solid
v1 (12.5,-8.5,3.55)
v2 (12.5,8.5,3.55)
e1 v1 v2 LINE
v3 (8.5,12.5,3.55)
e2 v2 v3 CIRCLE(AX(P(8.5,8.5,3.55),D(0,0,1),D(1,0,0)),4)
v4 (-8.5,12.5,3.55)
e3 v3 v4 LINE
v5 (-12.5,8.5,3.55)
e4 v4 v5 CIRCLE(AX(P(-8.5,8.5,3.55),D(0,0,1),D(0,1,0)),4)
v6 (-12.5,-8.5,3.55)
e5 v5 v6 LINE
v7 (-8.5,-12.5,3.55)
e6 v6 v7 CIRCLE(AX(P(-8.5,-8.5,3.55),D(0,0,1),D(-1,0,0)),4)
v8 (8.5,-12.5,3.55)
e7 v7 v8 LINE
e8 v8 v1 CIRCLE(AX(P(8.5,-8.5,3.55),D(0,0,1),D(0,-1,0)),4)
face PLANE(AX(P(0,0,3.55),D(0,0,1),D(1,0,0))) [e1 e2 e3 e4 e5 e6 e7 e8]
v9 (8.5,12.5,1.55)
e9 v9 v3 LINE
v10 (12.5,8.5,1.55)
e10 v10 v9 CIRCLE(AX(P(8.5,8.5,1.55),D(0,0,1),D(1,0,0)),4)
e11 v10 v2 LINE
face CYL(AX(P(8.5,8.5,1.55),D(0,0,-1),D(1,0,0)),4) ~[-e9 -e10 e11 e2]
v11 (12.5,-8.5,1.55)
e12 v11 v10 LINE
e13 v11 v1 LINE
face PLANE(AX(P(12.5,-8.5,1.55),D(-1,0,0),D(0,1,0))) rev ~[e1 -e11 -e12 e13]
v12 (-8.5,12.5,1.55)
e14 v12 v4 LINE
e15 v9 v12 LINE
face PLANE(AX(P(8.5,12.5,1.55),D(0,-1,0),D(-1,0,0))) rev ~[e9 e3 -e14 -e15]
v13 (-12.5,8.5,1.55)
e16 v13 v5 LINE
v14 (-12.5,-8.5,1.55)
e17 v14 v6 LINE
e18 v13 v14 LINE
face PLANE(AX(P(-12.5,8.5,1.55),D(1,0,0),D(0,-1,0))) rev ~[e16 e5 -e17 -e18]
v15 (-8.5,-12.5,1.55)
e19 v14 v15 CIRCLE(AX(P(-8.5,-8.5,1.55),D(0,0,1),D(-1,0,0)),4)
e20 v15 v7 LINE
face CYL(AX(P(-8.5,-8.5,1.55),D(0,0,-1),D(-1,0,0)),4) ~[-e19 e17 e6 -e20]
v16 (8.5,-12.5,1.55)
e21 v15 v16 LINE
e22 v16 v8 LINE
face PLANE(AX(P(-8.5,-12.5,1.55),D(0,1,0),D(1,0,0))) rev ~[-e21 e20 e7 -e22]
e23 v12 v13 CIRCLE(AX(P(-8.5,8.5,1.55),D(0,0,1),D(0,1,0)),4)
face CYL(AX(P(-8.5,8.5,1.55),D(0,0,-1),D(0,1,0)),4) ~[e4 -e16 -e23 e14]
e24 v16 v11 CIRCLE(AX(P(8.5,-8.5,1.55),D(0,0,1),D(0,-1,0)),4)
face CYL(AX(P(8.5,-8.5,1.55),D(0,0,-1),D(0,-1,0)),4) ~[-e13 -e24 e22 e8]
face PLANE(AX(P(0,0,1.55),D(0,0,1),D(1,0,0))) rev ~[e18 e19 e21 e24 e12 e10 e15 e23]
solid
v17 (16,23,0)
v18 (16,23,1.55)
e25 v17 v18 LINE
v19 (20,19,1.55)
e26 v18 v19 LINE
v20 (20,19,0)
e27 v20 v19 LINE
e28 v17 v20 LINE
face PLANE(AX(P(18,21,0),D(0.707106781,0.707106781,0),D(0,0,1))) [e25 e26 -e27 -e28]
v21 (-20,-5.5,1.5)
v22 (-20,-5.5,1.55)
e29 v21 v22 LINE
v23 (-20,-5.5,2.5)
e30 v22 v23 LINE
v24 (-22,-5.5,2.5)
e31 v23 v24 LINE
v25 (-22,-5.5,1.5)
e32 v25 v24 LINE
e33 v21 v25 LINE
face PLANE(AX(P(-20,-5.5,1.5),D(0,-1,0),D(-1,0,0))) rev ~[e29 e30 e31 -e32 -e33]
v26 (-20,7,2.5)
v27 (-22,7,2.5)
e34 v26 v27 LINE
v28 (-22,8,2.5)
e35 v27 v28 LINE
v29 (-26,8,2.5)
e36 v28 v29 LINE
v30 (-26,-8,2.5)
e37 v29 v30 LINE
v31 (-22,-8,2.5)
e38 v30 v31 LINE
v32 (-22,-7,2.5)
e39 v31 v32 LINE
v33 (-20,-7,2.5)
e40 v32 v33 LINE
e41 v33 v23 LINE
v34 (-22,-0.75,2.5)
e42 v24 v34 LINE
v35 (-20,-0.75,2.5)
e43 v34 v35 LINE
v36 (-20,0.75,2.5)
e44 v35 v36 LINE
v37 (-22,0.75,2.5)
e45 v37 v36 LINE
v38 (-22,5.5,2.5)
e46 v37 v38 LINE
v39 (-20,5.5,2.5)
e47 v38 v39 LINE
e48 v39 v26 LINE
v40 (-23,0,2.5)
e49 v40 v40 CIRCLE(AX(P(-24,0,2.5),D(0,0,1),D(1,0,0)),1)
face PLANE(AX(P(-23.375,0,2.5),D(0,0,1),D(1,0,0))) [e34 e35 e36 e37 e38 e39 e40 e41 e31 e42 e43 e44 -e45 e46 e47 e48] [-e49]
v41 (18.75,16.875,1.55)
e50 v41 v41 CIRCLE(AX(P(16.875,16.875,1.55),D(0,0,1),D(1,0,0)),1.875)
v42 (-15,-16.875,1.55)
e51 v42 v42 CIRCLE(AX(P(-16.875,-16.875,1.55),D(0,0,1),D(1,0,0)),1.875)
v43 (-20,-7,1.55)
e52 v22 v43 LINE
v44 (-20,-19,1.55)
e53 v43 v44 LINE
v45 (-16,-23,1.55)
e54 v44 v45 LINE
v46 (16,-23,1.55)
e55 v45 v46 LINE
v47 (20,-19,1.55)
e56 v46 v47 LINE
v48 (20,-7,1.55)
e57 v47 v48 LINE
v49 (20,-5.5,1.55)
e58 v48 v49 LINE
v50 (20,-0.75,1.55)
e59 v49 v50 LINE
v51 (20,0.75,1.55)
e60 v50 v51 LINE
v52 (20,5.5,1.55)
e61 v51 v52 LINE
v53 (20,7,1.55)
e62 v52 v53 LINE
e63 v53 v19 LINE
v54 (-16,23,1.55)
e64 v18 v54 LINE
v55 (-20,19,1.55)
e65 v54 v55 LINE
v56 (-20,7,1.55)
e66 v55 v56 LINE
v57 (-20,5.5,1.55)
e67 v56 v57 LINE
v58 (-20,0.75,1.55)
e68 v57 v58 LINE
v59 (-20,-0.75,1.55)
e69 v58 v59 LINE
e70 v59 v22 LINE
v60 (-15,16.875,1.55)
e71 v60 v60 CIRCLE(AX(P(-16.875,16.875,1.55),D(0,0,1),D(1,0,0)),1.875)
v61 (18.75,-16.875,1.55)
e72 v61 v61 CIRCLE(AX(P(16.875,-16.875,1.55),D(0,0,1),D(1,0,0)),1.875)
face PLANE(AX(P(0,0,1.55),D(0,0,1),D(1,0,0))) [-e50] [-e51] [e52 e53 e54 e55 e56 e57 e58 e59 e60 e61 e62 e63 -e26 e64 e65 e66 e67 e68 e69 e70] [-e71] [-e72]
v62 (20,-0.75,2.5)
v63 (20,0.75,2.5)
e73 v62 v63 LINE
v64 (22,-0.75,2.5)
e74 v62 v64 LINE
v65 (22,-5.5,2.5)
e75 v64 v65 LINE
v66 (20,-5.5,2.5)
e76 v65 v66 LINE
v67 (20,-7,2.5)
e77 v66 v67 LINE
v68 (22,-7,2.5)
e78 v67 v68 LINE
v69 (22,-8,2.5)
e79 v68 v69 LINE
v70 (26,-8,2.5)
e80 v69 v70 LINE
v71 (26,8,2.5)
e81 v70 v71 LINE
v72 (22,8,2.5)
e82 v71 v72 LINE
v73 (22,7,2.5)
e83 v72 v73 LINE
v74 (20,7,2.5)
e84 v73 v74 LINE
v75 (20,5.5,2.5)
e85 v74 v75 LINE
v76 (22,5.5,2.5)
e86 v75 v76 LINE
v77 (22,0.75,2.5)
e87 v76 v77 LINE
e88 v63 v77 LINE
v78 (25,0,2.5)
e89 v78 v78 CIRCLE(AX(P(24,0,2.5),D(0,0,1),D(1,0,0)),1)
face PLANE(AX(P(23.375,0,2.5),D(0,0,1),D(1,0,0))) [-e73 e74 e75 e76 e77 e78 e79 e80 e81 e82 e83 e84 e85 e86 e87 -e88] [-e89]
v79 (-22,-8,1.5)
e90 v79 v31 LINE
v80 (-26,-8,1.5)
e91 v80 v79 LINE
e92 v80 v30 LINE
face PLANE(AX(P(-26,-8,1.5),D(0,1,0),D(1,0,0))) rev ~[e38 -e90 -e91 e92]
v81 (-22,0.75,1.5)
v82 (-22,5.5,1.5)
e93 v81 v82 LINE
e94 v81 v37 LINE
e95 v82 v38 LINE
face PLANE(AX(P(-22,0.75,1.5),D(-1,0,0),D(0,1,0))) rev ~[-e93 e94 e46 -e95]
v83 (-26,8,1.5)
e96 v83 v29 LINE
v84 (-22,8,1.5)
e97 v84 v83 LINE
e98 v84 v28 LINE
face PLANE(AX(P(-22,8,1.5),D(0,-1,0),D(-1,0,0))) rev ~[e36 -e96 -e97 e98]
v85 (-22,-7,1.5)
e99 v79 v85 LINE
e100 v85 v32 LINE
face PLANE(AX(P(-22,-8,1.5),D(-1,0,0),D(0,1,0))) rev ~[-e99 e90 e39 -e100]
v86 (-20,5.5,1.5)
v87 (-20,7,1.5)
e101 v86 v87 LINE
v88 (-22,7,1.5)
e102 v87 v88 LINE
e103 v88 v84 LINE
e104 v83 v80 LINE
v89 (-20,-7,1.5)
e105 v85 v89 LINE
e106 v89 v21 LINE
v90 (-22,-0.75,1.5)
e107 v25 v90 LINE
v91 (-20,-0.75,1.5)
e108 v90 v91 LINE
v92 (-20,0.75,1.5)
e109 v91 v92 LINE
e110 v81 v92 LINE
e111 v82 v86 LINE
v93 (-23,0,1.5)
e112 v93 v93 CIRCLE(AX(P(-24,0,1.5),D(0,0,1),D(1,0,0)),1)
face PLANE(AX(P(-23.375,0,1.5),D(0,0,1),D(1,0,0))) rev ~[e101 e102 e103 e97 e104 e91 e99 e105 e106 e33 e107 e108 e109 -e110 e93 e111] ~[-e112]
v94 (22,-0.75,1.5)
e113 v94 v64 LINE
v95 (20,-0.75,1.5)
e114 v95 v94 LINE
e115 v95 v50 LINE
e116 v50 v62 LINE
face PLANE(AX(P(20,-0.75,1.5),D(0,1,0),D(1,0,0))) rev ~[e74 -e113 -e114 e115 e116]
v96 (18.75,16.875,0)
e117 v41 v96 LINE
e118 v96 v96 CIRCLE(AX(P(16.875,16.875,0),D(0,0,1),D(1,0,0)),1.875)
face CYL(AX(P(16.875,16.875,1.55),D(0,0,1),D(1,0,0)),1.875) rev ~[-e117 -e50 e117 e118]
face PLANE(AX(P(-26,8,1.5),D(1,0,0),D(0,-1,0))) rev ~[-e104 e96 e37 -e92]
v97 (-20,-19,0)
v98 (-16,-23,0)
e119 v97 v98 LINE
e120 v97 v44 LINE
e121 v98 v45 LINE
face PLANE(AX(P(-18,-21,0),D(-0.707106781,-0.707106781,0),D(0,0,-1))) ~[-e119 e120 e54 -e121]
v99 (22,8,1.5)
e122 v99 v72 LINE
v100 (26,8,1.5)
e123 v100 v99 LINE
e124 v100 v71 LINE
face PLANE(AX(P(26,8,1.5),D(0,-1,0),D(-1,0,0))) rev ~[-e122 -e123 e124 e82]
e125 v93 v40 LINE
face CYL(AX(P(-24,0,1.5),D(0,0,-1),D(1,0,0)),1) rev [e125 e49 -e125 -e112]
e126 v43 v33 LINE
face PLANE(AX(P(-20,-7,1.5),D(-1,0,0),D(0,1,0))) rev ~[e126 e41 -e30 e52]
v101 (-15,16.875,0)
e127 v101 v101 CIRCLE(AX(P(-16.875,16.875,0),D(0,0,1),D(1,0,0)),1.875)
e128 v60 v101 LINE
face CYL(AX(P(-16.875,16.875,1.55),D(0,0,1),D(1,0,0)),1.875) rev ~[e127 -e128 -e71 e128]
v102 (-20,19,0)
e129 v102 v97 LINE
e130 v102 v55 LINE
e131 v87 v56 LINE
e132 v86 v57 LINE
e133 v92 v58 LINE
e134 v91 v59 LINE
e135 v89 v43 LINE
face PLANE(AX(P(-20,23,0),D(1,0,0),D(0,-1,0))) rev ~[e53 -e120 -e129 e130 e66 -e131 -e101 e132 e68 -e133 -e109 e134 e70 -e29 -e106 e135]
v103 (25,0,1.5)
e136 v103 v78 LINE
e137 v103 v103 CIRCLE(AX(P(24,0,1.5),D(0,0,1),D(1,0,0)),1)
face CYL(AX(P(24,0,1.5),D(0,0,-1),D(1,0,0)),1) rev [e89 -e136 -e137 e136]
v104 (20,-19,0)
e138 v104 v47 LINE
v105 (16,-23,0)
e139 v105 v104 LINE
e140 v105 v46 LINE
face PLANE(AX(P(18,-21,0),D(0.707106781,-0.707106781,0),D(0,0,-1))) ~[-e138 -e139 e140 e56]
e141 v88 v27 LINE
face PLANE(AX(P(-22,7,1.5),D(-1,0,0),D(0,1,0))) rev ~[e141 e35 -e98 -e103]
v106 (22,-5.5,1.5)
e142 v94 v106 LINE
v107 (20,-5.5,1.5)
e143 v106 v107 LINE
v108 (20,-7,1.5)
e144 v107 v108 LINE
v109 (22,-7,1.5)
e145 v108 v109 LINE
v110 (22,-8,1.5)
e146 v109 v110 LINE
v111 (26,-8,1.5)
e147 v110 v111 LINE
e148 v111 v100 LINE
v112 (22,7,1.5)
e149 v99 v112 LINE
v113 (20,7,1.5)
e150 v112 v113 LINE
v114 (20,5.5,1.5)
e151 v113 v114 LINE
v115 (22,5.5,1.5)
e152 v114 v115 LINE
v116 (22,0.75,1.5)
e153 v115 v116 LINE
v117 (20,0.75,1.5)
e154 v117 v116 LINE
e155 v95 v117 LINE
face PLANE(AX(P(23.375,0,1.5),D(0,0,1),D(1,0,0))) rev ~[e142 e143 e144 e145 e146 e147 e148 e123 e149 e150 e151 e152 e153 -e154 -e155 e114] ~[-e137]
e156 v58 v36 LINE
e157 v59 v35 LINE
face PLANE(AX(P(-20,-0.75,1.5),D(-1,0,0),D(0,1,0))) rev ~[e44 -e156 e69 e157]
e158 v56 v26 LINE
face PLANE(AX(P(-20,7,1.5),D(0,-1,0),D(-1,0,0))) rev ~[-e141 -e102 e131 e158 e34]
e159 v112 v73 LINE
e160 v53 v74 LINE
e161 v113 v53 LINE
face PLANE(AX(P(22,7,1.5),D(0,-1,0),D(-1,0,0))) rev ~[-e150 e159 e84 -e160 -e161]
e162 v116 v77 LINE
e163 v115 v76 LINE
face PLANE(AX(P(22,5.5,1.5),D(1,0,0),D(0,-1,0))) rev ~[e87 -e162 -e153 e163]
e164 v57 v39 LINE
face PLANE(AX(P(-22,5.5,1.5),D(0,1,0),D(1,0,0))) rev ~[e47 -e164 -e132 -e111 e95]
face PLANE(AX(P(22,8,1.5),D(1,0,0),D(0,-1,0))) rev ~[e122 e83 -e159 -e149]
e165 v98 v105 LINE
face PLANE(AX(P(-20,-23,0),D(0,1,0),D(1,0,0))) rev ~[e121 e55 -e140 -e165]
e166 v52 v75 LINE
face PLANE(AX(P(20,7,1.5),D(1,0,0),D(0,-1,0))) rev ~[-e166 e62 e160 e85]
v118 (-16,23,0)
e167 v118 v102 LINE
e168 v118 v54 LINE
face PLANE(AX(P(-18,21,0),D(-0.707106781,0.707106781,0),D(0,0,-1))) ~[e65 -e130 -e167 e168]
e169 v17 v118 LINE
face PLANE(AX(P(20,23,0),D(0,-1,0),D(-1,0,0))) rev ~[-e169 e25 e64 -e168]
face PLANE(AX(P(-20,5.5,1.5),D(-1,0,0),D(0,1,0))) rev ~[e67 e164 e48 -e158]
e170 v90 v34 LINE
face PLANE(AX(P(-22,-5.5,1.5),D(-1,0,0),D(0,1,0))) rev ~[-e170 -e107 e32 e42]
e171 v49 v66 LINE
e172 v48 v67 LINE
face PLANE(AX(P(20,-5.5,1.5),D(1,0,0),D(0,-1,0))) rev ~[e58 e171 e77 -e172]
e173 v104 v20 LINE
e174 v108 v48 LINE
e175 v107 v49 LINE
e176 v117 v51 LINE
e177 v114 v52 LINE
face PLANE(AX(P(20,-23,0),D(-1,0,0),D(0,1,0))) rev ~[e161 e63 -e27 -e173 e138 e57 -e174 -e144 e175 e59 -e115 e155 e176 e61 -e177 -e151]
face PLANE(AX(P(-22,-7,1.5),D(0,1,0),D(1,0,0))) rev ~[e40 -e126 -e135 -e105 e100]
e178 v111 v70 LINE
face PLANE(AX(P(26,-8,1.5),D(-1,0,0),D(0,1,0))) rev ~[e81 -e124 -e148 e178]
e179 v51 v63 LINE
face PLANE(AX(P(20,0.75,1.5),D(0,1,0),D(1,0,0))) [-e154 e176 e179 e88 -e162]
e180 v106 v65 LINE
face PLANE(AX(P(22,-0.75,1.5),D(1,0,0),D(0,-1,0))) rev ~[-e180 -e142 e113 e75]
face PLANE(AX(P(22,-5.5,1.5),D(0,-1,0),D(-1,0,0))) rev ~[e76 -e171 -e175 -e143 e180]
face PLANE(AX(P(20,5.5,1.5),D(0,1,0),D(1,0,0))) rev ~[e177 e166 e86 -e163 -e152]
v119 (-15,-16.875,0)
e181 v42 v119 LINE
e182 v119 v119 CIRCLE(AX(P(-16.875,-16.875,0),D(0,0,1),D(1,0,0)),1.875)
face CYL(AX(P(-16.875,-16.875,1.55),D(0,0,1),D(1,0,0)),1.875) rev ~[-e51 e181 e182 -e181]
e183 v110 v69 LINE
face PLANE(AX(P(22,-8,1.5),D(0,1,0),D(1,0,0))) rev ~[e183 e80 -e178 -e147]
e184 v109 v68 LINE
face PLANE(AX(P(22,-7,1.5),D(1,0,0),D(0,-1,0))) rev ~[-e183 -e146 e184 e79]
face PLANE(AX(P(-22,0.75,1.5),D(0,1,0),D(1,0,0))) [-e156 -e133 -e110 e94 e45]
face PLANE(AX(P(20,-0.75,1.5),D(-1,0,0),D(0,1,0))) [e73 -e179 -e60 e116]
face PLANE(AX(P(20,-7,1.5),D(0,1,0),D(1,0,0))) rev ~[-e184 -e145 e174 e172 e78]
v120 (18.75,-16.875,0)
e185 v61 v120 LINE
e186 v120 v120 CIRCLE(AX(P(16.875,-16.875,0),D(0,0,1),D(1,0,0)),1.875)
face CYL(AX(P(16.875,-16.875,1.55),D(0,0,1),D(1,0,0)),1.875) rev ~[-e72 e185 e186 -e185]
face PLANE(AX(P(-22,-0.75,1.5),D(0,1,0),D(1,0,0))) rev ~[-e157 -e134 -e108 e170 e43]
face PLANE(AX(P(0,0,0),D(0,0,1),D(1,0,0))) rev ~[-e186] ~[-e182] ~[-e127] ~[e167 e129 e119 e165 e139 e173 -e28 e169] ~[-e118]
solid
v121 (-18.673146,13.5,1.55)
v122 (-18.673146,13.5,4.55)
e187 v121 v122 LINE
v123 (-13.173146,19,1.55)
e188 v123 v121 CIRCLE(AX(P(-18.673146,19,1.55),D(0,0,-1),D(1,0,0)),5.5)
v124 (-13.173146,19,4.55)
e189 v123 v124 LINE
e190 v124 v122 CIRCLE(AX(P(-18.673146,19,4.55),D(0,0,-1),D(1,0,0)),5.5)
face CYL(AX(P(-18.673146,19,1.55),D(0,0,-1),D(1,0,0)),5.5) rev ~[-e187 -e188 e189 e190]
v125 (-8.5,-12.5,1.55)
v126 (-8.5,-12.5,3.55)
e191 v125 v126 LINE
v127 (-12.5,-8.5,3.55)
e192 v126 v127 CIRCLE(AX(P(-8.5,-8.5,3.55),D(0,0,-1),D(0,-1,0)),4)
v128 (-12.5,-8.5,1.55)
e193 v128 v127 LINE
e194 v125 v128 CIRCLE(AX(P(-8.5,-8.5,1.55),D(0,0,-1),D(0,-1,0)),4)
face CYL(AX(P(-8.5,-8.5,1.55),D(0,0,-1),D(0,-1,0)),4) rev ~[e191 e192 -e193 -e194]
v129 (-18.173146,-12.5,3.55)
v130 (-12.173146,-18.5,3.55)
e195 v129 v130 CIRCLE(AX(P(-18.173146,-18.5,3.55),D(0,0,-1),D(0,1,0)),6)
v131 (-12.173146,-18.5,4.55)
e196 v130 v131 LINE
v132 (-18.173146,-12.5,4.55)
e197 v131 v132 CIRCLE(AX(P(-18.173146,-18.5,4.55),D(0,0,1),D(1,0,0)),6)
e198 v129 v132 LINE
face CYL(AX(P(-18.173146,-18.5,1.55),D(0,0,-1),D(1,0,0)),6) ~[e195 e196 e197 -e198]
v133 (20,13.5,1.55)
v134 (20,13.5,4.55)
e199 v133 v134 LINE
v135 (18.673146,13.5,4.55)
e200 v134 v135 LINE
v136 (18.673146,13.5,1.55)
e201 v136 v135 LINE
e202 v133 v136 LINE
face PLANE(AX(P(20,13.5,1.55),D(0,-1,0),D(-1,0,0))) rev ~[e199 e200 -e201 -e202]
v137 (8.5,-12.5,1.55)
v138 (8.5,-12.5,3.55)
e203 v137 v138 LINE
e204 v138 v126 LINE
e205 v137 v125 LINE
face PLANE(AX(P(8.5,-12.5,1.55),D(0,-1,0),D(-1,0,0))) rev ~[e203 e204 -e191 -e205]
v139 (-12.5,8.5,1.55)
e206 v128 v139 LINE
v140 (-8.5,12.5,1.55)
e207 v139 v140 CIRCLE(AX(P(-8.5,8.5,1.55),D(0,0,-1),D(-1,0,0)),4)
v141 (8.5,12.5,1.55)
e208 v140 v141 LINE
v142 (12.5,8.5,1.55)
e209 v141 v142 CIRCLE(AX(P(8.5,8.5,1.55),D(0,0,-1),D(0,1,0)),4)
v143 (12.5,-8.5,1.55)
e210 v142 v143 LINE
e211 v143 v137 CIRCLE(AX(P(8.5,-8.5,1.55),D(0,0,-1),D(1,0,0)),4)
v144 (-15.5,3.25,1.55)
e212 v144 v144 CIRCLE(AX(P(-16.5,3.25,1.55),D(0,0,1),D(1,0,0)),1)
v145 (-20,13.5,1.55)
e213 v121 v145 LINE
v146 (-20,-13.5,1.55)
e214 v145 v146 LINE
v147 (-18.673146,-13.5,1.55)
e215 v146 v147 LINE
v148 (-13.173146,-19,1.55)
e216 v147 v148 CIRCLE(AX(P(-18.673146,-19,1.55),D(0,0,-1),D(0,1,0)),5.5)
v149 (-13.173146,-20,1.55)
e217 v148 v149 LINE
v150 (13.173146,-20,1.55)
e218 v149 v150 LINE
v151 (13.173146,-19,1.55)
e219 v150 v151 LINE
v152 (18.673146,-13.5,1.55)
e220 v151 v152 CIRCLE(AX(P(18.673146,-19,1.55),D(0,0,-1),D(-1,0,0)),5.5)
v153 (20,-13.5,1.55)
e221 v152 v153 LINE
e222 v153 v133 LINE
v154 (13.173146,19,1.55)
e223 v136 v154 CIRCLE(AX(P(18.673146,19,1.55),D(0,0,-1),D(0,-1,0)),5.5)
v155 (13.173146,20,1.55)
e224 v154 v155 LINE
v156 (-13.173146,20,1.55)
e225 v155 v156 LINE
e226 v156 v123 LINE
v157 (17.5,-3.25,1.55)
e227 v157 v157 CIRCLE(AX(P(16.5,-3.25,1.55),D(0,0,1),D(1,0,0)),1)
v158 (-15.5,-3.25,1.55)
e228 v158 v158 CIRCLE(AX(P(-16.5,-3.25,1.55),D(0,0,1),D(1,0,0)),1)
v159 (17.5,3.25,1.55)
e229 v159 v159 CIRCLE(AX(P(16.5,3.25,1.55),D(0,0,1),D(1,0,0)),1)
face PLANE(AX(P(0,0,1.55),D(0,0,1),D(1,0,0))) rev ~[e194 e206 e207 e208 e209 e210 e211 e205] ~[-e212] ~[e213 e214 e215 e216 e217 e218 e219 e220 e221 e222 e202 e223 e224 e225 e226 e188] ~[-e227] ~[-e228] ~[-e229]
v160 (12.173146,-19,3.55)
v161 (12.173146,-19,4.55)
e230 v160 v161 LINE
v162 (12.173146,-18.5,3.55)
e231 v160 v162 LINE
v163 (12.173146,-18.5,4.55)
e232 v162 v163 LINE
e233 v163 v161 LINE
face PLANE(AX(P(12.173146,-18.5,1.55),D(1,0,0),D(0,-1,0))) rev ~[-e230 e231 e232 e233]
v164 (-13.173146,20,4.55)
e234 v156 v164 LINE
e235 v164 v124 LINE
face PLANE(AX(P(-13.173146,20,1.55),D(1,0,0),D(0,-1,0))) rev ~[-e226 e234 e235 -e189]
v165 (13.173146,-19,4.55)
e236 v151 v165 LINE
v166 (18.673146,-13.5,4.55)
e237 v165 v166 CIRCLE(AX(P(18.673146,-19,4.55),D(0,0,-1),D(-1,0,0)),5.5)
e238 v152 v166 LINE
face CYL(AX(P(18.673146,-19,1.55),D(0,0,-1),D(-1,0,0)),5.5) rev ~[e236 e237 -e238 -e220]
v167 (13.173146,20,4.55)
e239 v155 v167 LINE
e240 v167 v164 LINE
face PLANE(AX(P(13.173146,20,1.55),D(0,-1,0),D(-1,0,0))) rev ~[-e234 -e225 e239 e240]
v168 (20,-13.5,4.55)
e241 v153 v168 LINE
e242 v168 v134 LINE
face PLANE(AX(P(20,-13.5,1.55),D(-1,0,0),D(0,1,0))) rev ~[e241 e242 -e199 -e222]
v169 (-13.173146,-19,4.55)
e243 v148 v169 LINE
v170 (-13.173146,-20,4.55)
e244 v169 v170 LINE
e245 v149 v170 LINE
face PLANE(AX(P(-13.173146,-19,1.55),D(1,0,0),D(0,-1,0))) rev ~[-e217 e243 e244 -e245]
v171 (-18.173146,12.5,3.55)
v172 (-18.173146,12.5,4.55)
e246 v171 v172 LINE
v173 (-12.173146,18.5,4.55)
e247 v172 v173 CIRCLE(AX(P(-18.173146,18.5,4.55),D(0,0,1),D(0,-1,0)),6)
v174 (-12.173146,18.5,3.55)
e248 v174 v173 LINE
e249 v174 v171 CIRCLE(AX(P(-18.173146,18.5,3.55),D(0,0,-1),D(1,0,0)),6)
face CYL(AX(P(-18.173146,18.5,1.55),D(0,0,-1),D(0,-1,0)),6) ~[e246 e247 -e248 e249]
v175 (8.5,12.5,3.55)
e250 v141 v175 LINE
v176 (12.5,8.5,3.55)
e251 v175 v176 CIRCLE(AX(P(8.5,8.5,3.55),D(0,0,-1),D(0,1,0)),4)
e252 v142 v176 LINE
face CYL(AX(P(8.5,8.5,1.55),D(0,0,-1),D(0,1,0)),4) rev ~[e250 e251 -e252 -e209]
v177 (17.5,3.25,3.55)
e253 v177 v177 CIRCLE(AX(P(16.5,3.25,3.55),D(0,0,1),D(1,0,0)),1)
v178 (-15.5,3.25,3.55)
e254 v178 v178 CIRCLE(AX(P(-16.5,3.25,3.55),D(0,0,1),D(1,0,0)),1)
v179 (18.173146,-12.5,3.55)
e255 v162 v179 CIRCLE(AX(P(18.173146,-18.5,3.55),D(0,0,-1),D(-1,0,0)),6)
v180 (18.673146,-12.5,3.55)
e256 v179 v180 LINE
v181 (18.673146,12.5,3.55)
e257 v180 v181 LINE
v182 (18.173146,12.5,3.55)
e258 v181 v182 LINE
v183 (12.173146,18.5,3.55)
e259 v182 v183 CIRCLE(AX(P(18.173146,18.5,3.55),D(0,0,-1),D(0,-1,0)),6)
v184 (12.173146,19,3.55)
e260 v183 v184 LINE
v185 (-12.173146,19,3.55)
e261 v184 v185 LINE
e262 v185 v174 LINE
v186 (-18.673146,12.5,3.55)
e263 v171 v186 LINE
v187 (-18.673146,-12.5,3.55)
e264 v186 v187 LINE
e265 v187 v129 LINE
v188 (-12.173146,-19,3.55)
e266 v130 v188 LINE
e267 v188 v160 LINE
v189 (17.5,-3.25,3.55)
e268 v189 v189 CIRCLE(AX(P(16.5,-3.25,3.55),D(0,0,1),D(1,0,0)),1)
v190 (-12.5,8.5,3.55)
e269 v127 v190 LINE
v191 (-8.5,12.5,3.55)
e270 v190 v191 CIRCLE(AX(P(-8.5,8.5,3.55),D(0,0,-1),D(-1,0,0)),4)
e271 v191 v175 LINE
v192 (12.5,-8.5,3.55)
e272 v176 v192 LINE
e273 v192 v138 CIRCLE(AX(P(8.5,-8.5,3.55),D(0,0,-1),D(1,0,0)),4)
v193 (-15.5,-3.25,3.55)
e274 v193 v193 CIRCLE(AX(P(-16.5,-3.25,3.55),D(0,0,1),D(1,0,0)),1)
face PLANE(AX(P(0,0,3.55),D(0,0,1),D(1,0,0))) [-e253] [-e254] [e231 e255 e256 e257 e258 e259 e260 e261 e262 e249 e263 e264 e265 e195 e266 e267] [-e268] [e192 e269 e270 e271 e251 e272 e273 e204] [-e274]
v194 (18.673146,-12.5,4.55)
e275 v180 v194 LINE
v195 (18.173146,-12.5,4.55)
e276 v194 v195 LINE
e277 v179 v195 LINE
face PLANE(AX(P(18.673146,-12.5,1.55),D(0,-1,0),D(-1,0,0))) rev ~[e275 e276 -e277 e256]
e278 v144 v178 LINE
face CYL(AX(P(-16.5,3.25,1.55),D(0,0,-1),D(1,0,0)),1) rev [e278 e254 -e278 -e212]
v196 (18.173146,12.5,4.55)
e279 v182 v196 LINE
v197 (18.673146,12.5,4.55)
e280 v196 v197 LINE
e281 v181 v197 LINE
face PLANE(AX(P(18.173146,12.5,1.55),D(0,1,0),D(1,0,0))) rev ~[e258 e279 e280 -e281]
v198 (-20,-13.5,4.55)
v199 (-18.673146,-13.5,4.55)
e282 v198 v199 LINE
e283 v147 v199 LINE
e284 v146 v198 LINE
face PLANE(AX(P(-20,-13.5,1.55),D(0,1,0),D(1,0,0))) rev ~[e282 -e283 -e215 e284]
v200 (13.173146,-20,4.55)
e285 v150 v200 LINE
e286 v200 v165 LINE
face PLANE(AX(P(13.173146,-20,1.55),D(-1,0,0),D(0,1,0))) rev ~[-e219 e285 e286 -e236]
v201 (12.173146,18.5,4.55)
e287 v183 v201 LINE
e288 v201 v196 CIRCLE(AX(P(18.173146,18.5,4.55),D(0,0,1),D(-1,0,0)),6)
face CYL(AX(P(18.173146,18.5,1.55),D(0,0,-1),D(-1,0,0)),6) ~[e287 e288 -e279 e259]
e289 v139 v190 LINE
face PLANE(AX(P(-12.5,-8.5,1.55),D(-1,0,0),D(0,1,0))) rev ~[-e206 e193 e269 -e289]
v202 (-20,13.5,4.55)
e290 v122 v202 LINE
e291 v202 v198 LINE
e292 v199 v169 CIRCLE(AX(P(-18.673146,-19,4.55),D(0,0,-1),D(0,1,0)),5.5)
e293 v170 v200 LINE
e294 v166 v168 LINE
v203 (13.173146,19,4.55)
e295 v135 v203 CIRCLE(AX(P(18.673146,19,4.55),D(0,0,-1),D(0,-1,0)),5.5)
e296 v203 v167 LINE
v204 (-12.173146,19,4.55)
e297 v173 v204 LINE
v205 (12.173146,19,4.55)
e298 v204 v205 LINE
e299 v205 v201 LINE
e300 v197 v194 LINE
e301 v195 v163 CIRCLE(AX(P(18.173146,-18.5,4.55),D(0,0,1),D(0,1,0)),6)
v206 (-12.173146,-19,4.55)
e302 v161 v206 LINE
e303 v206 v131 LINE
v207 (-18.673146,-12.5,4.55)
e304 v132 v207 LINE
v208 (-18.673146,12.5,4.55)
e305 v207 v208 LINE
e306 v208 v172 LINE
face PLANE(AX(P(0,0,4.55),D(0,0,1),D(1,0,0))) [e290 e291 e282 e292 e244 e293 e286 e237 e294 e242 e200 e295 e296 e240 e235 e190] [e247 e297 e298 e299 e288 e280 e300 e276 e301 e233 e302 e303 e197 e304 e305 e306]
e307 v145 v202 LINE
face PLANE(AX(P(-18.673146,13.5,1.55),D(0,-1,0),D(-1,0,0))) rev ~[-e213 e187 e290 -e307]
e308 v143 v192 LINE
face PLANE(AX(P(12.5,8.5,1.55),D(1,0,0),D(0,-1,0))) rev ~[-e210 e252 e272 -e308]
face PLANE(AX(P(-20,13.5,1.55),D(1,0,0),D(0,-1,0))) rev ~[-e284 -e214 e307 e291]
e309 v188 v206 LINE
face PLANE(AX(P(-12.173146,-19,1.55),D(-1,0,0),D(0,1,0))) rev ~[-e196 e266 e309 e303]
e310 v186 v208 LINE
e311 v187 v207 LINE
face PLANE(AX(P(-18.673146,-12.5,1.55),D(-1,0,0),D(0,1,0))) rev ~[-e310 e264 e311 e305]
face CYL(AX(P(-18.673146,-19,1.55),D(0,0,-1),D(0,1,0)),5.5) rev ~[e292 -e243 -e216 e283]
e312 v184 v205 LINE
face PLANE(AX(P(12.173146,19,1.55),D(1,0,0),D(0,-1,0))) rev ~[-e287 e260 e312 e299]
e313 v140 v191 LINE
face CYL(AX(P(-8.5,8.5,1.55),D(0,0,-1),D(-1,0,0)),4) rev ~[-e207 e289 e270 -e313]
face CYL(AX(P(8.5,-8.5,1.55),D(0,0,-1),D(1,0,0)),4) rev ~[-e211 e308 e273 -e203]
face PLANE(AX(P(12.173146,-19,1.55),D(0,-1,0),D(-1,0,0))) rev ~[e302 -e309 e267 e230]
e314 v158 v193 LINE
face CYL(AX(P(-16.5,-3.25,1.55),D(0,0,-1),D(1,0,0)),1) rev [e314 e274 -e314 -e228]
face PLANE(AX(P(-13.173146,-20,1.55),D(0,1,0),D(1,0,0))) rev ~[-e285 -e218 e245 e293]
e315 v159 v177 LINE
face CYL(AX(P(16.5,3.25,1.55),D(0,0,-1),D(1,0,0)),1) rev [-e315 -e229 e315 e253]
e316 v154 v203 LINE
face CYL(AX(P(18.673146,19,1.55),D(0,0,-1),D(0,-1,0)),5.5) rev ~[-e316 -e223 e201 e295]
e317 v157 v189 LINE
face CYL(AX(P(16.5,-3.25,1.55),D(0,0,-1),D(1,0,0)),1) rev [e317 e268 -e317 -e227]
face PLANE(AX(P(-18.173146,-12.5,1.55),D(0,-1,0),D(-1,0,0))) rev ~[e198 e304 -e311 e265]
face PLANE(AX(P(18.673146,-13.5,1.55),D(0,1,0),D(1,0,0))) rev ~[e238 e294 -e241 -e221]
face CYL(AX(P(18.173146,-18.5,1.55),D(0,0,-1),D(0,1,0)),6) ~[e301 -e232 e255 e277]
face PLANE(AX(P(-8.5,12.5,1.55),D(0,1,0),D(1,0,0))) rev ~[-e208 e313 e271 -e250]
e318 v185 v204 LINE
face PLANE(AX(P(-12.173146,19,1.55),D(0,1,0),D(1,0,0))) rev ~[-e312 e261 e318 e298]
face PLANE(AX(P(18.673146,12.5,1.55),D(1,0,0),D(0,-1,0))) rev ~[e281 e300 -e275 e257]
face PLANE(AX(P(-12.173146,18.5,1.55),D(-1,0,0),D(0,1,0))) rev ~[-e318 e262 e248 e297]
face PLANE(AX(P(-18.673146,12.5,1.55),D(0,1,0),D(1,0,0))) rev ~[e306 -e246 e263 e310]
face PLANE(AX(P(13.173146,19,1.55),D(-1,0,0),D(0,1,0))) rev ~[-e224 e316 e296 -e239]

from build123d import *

# Parameters (mm, degrees)
F1_DEPTH = 1.55
F3_SIZE  = 4
F4_R     = 1.875
F5_DEPTH = 4
F6_DEPTH = 3
F2_R     = 1
F2_W     = 1.5
F2_H     = 0.5
F2_W_2   = 0.5
F2_H_2   = 1.5219762474
F2_H_3   = 1.4780237526
F7_DEPTH = 2
F8_DEPTH = 2
F9_START = 1.5
F0_R     = 1
F0_W     = 2
F0_H     = 1.5
F9_DEPTH = 1


with BuildPart() as f1:
    # F0 (on Top) → F1 (new body)
    with BuildSketch(Plane.XY):
        Polygon((20, 23), (-20, 23), (-20, 7), (-20, 5.5), (-20, 0.75), (-20, -0.75), (-20, -5.5), (-20, -7), (-20, -23), (20, -23), (20, -7), (20, -5.5), (20, -0.75), (20, 0.75), (20, 5.5), (20, 7), align=None)
    extrude(amount=F1_DEPTH)

    # F3
    f3_edges = [f1.edges().sort_by_distance(p)[0] for p in [
        (-20, 23, 0.775),
        (20, 23, 0.775),
        (20, -23, 0.775),
        (-20, -23, 0.775),
    ]]
    chamfer(f3_edges, length=F3_SIZE)

    # F4 (on face) → F5 (cut)
    with BuildSketch(Plane.XY.offset(1.55)):
        with Locations((-16.875, -16.875)):
            Circle(F4_R)
        with Locations((16.875, -16.875)):
            Circle(F4_R)
        with Locations((16.875, 16.875)):
            Circle(F4_R)
        with Locations((-16.875, 16.875)):
            Circle(F4_R)
    extrude(amount=-F5_DEPTH, mode=Mode.SUBTRACT)

    # F0 (on Top) → F9 (join)
    with BuildSketch(Plane.XY.offset(F9_START)):
        Polygon((-20, 5.5), (-20, 7), (-22, 7), (-22, 8), (-26, 8), (-26, -8), (-22, -8), (-22, -7), (-20, -7), (-20, -5.5), (-22, -5.5), (-22, -0.75), (-22, 0.75), (-22, 5.5), align=None)
        with Locations((-24, 0)):
            Circle(F0_R, mode=Mode.SUBTRACT)
        Polygon((22, 7), (20, 7), (20, 5.5), (22, 5.5), (22, 0.75), (22, -0.75), (22, -5.5), (20, -5.5), (20, -7), (22, -7), (22, -8), (26, -8), (26, 8), (22, 8), align=None)
        with Locations((24, 0)):
            Circle(F0_R, mode=Mode.SUBTRACT)
        with Locations((21, 0)):
            Rectangle(F0_W, F0_H)
        with Locations((-21, 0)):
            Rectangle(F0_W, F0_H)
    extrude(amount=F9_DEPTH)


with BuildPart() as f6:
    # F2 (on face) → F6 (new body)
    with BuildSketch(Plane.XY.offset(1.55)):
        with BuildLine():
            Line((13.1731458455, 20), (-13.1731458455, 20))
            Line((-13.1731458455, 20), (-13.1731458455, 19))
            ThreePointArc((-13.1731458455, 19), (-14.784058549, 15.1109127035), (-18.6731458455, 13.5))
            Line((-18.6731458455, 13.5), (-20, 13.5))
            Line((-20, 13.5), (-20, -13.5))
            Line((-20, -13.5), (-18.6731458455, -13.5))
            ThreePointArc((-18.6731458455, -13.5), (-14.784058549, -15.1109127035), (-13.1731458455, -19))
            Line((-13.1731458455, -19), (-13.1731458455, -20))
            Line((-13.1731458455, -20), (13.1731458455, -20))
            Line((13.1731458455, -20), (13.1731458455, -19))
            ThreePointArc((13.1731458455, -19), (14.784058549, -15.1109127035), (18.6731458455, -13.5))
            Line((18.6731458455, -13.5), (20, -13.5))
            Line((20, -13.5), (20, 13.5))
            Line((20, 13.5), (18.6731458455, 13.5))
            ThreePointArc((18.6731458455, 13.5), (14.784058549, 15.1109127035), (13.1731458455, 19))
            Line((13.1731458455, 19), (13.1731458455, 20))
        make_face()
        with BuildLine():
            Line((-12.1731458455, 18.5), (-12.1731458455, 19))
            Line((-12.1731458455, 19), (12.1731458455, 19))
            Line((12.1731458455, 19), (12.1731458455, 18.5))
            ThreePointArc((12.1731458455, 18.5), (13.9305051584, 14.2573593129), (18.1731458455, 12.5))
            Line((18.1731458455, 12.5), (18.6731458455, 12.5))
            Line((18.6731458455, 12.5), (18.6731458455, -12.5))
            Line((18.6731458455, -12.5), (18.1731458455, -12.5))
            ThreePointArc((18.1731458455, -12.5), (13.9305051584, -14.2573593129), (12.1731458455, -18.5))
            Line((12.1731458455, -18.5), (12.1731458455, -19))
            Line((12.1731458455, -19), (-12.1731458455, -19))
            Line((-12.1731458455, -19), (-12.1731458455, -18.5))
            ThreePointArc((-12.1731458455, -18.5), (-13.9305051584, -14.2573593129), (-18.1731458455, -12.5))
            Line((-18.1731458455, -12.5), (-18.6731458455, -12.5))
            Line((-18.6731458455, -12.5), (-18.6731458455, 12.5))
            Line((-18.6731458455, 12.5), (-18.1731458455, 12.5))
            ThreePointArc((-18.1731458455, 12.5), (-13.9305051584, 14.2573593129), (-12.1731458455, 18.5))
        make_face(mode=Mode.SUBTRACT)
    extrude(amount=F6_DEPTH)

    # F2 (on face) → F7 (join)
    with BuildSketch(Plane.XY.offset(1.55)):
        with BuildLine():
            Line((12.1731458455, 19), (-12.1731458455, 19))
            Line((-12.1731458455, 19), (-12.1731458455, 18.5))
            ThreePointArc((-12.1731458455, 18.5), (-13.9305051584, 14.2573593129), (-18.1731458455, 12.5))
            Line((-18.1731458455, 12.5), (-18.6731458455, 12.5))
            Line((-18.6731458455, 12.5), (-18.6731458455, -12.5))
            Line((-18.6731458455, -12.5), (-18.1731458455, -12.5))
            ThreePointArc((-18.1731458455, -12.5), (-13.9305051584, -14.2573593129), (-12.1731458455, -18.5))
            Line((-12.1731458455, -18.5), (-12.1731458455, -19))
            Line((-12.1731458455, -19), (12.1731458455, -19))
            Line((12.1731458455, -19), (12.1731458455, -18.5))
            ThreePointArc((12.1731458455, -18.5), (13.9305051584, -14.2573593129), (18.1731458455, -12.5))
            Line((18.1731458455, -12.5), (18.6731458455, -12.5))
            Line((18.6731458455, -12.5), (18.6731458455, 12.5))
            Line((18.6731458455, 12.5), (18.1731458455, 12.5))
            ThreePointArc((18.1731458455, 12.5), (13.9305051584, 14.2573593129), (12.1731458455, 18.5))
            Line((12.1731458455, 18.5), (12.1731458455, 19))
        make_face()
        Polygon((-9.1731458455, -16.4780237526), (-9.1731458455, -18), (-9.6731458455, -18), (-9.6731458455, -16.4780237526), (-11.1731458455, -16.4780237526), (-11.1731458455, -15.9780237526), (-9.6731458455, -15.9780237526), (-9.6731458455, -14.5), (-9.1731458455, -14.5), (-9.1731458455, -15.9780237526), (-7.6731458455, -15.9780237526), (-7.6731458455, -16.4780237526), align=None, mode=Mode.SUBTRACT)
        with Locations((-16.5, -3.25)):
            Circle(F2_R, mode=Mode.SUBTRACT)
        with Locations((16.5, -3.25)):
            Circle(F2_R, mode=Mode.SUBTRACT)
        with Locations((-16.5, 3.25)):
            Circle(F2_R, mode=Mode.SUBTRACT)
        with BuildLine():
            ThreePointArc((-12.5, 8.5), (-11.3284271247, 11.3284271247), (-8.5, 12.5))
            Line((-8.5, 12.5), (8.5, 12.5))
            ThreePointArc((8.5, 12.5), (11.3284271247, 11.3284271247), (12.5, 8.5))
            Line((12.5, 8.5), (12.5, -8.5))
            ThreePointArc((12.5, -8.5), (11.3284271247, -11.3284271247), (8.5, -12.5))
            Line((8.5, -12.5), (-8.5, -12.5))
            ThreePointArc((-8.5, -12.5), (-11.3284271247, -11.3284271247), (-12.5, -8.5))
            Line((-12.5, -8.5), (-12.5, 8.5))
        make_face(mode=Mode.SUBTRACT)
        with Locations((16.5, 3.25)):
            Circle(F2_R, mode=Mode.SUBTRACT)
        with Locations((-8.4231458455, -16.2280237526)):
            Rectangle(F2_W, F2_H)
        with Locations((-10.4231458455, -16.2280237526)):
            Rectangle(F2_W, F2_H)
        with Locations((-9.4231458455, -17.2390118763)):
            Rectangle(F2_W_2, F2_H_2)
        with Locations((-9.4231458455, -15.2390118763)):
            Rectangle(F2_W_2, F2_H_3)
        with Locations((-9.4231458455, -16.2280237526)):
            Rectangle(F2_W_2, F2_H)
    extrude(amount=F7_DEPTH)


with BuildPart() as f8:
    # F2 (on face) → F8 (new body)
    with BuildSketch(Plane.XY.offset(1.55)):
        with BuildLine():
            Line((8.5, 12.5), (-8.5, 12.5))
            ThreePointArc((-8.5, 12.5), (-11.3284271247, 11.3284271247), (-12.5, 8.5))
            Line((-12.5, 8.5), (-12.5, -8.5))
            ThreePointArc((-12.5, -8.5), (-11.3284271247, -11.3284271247), (-8.5, -12.5))
            Line((-8.5, -12.5), (8.5, -12.5))
            ThreePointArc((8.5, -12.5), (11.3284271247, -11.3284271247), (12.5, -8.5))
            Line((12.5, -8.5), (12.5, 8.5))
            ThreePointArc((12.5, 8.5), (11.3284271247, 11.3284271247), (8.5, 12.5))
        make_face()
    extrude(amount=F8_DEPTH)


solid = Compound([f1.part, f6.part, f8.part])
